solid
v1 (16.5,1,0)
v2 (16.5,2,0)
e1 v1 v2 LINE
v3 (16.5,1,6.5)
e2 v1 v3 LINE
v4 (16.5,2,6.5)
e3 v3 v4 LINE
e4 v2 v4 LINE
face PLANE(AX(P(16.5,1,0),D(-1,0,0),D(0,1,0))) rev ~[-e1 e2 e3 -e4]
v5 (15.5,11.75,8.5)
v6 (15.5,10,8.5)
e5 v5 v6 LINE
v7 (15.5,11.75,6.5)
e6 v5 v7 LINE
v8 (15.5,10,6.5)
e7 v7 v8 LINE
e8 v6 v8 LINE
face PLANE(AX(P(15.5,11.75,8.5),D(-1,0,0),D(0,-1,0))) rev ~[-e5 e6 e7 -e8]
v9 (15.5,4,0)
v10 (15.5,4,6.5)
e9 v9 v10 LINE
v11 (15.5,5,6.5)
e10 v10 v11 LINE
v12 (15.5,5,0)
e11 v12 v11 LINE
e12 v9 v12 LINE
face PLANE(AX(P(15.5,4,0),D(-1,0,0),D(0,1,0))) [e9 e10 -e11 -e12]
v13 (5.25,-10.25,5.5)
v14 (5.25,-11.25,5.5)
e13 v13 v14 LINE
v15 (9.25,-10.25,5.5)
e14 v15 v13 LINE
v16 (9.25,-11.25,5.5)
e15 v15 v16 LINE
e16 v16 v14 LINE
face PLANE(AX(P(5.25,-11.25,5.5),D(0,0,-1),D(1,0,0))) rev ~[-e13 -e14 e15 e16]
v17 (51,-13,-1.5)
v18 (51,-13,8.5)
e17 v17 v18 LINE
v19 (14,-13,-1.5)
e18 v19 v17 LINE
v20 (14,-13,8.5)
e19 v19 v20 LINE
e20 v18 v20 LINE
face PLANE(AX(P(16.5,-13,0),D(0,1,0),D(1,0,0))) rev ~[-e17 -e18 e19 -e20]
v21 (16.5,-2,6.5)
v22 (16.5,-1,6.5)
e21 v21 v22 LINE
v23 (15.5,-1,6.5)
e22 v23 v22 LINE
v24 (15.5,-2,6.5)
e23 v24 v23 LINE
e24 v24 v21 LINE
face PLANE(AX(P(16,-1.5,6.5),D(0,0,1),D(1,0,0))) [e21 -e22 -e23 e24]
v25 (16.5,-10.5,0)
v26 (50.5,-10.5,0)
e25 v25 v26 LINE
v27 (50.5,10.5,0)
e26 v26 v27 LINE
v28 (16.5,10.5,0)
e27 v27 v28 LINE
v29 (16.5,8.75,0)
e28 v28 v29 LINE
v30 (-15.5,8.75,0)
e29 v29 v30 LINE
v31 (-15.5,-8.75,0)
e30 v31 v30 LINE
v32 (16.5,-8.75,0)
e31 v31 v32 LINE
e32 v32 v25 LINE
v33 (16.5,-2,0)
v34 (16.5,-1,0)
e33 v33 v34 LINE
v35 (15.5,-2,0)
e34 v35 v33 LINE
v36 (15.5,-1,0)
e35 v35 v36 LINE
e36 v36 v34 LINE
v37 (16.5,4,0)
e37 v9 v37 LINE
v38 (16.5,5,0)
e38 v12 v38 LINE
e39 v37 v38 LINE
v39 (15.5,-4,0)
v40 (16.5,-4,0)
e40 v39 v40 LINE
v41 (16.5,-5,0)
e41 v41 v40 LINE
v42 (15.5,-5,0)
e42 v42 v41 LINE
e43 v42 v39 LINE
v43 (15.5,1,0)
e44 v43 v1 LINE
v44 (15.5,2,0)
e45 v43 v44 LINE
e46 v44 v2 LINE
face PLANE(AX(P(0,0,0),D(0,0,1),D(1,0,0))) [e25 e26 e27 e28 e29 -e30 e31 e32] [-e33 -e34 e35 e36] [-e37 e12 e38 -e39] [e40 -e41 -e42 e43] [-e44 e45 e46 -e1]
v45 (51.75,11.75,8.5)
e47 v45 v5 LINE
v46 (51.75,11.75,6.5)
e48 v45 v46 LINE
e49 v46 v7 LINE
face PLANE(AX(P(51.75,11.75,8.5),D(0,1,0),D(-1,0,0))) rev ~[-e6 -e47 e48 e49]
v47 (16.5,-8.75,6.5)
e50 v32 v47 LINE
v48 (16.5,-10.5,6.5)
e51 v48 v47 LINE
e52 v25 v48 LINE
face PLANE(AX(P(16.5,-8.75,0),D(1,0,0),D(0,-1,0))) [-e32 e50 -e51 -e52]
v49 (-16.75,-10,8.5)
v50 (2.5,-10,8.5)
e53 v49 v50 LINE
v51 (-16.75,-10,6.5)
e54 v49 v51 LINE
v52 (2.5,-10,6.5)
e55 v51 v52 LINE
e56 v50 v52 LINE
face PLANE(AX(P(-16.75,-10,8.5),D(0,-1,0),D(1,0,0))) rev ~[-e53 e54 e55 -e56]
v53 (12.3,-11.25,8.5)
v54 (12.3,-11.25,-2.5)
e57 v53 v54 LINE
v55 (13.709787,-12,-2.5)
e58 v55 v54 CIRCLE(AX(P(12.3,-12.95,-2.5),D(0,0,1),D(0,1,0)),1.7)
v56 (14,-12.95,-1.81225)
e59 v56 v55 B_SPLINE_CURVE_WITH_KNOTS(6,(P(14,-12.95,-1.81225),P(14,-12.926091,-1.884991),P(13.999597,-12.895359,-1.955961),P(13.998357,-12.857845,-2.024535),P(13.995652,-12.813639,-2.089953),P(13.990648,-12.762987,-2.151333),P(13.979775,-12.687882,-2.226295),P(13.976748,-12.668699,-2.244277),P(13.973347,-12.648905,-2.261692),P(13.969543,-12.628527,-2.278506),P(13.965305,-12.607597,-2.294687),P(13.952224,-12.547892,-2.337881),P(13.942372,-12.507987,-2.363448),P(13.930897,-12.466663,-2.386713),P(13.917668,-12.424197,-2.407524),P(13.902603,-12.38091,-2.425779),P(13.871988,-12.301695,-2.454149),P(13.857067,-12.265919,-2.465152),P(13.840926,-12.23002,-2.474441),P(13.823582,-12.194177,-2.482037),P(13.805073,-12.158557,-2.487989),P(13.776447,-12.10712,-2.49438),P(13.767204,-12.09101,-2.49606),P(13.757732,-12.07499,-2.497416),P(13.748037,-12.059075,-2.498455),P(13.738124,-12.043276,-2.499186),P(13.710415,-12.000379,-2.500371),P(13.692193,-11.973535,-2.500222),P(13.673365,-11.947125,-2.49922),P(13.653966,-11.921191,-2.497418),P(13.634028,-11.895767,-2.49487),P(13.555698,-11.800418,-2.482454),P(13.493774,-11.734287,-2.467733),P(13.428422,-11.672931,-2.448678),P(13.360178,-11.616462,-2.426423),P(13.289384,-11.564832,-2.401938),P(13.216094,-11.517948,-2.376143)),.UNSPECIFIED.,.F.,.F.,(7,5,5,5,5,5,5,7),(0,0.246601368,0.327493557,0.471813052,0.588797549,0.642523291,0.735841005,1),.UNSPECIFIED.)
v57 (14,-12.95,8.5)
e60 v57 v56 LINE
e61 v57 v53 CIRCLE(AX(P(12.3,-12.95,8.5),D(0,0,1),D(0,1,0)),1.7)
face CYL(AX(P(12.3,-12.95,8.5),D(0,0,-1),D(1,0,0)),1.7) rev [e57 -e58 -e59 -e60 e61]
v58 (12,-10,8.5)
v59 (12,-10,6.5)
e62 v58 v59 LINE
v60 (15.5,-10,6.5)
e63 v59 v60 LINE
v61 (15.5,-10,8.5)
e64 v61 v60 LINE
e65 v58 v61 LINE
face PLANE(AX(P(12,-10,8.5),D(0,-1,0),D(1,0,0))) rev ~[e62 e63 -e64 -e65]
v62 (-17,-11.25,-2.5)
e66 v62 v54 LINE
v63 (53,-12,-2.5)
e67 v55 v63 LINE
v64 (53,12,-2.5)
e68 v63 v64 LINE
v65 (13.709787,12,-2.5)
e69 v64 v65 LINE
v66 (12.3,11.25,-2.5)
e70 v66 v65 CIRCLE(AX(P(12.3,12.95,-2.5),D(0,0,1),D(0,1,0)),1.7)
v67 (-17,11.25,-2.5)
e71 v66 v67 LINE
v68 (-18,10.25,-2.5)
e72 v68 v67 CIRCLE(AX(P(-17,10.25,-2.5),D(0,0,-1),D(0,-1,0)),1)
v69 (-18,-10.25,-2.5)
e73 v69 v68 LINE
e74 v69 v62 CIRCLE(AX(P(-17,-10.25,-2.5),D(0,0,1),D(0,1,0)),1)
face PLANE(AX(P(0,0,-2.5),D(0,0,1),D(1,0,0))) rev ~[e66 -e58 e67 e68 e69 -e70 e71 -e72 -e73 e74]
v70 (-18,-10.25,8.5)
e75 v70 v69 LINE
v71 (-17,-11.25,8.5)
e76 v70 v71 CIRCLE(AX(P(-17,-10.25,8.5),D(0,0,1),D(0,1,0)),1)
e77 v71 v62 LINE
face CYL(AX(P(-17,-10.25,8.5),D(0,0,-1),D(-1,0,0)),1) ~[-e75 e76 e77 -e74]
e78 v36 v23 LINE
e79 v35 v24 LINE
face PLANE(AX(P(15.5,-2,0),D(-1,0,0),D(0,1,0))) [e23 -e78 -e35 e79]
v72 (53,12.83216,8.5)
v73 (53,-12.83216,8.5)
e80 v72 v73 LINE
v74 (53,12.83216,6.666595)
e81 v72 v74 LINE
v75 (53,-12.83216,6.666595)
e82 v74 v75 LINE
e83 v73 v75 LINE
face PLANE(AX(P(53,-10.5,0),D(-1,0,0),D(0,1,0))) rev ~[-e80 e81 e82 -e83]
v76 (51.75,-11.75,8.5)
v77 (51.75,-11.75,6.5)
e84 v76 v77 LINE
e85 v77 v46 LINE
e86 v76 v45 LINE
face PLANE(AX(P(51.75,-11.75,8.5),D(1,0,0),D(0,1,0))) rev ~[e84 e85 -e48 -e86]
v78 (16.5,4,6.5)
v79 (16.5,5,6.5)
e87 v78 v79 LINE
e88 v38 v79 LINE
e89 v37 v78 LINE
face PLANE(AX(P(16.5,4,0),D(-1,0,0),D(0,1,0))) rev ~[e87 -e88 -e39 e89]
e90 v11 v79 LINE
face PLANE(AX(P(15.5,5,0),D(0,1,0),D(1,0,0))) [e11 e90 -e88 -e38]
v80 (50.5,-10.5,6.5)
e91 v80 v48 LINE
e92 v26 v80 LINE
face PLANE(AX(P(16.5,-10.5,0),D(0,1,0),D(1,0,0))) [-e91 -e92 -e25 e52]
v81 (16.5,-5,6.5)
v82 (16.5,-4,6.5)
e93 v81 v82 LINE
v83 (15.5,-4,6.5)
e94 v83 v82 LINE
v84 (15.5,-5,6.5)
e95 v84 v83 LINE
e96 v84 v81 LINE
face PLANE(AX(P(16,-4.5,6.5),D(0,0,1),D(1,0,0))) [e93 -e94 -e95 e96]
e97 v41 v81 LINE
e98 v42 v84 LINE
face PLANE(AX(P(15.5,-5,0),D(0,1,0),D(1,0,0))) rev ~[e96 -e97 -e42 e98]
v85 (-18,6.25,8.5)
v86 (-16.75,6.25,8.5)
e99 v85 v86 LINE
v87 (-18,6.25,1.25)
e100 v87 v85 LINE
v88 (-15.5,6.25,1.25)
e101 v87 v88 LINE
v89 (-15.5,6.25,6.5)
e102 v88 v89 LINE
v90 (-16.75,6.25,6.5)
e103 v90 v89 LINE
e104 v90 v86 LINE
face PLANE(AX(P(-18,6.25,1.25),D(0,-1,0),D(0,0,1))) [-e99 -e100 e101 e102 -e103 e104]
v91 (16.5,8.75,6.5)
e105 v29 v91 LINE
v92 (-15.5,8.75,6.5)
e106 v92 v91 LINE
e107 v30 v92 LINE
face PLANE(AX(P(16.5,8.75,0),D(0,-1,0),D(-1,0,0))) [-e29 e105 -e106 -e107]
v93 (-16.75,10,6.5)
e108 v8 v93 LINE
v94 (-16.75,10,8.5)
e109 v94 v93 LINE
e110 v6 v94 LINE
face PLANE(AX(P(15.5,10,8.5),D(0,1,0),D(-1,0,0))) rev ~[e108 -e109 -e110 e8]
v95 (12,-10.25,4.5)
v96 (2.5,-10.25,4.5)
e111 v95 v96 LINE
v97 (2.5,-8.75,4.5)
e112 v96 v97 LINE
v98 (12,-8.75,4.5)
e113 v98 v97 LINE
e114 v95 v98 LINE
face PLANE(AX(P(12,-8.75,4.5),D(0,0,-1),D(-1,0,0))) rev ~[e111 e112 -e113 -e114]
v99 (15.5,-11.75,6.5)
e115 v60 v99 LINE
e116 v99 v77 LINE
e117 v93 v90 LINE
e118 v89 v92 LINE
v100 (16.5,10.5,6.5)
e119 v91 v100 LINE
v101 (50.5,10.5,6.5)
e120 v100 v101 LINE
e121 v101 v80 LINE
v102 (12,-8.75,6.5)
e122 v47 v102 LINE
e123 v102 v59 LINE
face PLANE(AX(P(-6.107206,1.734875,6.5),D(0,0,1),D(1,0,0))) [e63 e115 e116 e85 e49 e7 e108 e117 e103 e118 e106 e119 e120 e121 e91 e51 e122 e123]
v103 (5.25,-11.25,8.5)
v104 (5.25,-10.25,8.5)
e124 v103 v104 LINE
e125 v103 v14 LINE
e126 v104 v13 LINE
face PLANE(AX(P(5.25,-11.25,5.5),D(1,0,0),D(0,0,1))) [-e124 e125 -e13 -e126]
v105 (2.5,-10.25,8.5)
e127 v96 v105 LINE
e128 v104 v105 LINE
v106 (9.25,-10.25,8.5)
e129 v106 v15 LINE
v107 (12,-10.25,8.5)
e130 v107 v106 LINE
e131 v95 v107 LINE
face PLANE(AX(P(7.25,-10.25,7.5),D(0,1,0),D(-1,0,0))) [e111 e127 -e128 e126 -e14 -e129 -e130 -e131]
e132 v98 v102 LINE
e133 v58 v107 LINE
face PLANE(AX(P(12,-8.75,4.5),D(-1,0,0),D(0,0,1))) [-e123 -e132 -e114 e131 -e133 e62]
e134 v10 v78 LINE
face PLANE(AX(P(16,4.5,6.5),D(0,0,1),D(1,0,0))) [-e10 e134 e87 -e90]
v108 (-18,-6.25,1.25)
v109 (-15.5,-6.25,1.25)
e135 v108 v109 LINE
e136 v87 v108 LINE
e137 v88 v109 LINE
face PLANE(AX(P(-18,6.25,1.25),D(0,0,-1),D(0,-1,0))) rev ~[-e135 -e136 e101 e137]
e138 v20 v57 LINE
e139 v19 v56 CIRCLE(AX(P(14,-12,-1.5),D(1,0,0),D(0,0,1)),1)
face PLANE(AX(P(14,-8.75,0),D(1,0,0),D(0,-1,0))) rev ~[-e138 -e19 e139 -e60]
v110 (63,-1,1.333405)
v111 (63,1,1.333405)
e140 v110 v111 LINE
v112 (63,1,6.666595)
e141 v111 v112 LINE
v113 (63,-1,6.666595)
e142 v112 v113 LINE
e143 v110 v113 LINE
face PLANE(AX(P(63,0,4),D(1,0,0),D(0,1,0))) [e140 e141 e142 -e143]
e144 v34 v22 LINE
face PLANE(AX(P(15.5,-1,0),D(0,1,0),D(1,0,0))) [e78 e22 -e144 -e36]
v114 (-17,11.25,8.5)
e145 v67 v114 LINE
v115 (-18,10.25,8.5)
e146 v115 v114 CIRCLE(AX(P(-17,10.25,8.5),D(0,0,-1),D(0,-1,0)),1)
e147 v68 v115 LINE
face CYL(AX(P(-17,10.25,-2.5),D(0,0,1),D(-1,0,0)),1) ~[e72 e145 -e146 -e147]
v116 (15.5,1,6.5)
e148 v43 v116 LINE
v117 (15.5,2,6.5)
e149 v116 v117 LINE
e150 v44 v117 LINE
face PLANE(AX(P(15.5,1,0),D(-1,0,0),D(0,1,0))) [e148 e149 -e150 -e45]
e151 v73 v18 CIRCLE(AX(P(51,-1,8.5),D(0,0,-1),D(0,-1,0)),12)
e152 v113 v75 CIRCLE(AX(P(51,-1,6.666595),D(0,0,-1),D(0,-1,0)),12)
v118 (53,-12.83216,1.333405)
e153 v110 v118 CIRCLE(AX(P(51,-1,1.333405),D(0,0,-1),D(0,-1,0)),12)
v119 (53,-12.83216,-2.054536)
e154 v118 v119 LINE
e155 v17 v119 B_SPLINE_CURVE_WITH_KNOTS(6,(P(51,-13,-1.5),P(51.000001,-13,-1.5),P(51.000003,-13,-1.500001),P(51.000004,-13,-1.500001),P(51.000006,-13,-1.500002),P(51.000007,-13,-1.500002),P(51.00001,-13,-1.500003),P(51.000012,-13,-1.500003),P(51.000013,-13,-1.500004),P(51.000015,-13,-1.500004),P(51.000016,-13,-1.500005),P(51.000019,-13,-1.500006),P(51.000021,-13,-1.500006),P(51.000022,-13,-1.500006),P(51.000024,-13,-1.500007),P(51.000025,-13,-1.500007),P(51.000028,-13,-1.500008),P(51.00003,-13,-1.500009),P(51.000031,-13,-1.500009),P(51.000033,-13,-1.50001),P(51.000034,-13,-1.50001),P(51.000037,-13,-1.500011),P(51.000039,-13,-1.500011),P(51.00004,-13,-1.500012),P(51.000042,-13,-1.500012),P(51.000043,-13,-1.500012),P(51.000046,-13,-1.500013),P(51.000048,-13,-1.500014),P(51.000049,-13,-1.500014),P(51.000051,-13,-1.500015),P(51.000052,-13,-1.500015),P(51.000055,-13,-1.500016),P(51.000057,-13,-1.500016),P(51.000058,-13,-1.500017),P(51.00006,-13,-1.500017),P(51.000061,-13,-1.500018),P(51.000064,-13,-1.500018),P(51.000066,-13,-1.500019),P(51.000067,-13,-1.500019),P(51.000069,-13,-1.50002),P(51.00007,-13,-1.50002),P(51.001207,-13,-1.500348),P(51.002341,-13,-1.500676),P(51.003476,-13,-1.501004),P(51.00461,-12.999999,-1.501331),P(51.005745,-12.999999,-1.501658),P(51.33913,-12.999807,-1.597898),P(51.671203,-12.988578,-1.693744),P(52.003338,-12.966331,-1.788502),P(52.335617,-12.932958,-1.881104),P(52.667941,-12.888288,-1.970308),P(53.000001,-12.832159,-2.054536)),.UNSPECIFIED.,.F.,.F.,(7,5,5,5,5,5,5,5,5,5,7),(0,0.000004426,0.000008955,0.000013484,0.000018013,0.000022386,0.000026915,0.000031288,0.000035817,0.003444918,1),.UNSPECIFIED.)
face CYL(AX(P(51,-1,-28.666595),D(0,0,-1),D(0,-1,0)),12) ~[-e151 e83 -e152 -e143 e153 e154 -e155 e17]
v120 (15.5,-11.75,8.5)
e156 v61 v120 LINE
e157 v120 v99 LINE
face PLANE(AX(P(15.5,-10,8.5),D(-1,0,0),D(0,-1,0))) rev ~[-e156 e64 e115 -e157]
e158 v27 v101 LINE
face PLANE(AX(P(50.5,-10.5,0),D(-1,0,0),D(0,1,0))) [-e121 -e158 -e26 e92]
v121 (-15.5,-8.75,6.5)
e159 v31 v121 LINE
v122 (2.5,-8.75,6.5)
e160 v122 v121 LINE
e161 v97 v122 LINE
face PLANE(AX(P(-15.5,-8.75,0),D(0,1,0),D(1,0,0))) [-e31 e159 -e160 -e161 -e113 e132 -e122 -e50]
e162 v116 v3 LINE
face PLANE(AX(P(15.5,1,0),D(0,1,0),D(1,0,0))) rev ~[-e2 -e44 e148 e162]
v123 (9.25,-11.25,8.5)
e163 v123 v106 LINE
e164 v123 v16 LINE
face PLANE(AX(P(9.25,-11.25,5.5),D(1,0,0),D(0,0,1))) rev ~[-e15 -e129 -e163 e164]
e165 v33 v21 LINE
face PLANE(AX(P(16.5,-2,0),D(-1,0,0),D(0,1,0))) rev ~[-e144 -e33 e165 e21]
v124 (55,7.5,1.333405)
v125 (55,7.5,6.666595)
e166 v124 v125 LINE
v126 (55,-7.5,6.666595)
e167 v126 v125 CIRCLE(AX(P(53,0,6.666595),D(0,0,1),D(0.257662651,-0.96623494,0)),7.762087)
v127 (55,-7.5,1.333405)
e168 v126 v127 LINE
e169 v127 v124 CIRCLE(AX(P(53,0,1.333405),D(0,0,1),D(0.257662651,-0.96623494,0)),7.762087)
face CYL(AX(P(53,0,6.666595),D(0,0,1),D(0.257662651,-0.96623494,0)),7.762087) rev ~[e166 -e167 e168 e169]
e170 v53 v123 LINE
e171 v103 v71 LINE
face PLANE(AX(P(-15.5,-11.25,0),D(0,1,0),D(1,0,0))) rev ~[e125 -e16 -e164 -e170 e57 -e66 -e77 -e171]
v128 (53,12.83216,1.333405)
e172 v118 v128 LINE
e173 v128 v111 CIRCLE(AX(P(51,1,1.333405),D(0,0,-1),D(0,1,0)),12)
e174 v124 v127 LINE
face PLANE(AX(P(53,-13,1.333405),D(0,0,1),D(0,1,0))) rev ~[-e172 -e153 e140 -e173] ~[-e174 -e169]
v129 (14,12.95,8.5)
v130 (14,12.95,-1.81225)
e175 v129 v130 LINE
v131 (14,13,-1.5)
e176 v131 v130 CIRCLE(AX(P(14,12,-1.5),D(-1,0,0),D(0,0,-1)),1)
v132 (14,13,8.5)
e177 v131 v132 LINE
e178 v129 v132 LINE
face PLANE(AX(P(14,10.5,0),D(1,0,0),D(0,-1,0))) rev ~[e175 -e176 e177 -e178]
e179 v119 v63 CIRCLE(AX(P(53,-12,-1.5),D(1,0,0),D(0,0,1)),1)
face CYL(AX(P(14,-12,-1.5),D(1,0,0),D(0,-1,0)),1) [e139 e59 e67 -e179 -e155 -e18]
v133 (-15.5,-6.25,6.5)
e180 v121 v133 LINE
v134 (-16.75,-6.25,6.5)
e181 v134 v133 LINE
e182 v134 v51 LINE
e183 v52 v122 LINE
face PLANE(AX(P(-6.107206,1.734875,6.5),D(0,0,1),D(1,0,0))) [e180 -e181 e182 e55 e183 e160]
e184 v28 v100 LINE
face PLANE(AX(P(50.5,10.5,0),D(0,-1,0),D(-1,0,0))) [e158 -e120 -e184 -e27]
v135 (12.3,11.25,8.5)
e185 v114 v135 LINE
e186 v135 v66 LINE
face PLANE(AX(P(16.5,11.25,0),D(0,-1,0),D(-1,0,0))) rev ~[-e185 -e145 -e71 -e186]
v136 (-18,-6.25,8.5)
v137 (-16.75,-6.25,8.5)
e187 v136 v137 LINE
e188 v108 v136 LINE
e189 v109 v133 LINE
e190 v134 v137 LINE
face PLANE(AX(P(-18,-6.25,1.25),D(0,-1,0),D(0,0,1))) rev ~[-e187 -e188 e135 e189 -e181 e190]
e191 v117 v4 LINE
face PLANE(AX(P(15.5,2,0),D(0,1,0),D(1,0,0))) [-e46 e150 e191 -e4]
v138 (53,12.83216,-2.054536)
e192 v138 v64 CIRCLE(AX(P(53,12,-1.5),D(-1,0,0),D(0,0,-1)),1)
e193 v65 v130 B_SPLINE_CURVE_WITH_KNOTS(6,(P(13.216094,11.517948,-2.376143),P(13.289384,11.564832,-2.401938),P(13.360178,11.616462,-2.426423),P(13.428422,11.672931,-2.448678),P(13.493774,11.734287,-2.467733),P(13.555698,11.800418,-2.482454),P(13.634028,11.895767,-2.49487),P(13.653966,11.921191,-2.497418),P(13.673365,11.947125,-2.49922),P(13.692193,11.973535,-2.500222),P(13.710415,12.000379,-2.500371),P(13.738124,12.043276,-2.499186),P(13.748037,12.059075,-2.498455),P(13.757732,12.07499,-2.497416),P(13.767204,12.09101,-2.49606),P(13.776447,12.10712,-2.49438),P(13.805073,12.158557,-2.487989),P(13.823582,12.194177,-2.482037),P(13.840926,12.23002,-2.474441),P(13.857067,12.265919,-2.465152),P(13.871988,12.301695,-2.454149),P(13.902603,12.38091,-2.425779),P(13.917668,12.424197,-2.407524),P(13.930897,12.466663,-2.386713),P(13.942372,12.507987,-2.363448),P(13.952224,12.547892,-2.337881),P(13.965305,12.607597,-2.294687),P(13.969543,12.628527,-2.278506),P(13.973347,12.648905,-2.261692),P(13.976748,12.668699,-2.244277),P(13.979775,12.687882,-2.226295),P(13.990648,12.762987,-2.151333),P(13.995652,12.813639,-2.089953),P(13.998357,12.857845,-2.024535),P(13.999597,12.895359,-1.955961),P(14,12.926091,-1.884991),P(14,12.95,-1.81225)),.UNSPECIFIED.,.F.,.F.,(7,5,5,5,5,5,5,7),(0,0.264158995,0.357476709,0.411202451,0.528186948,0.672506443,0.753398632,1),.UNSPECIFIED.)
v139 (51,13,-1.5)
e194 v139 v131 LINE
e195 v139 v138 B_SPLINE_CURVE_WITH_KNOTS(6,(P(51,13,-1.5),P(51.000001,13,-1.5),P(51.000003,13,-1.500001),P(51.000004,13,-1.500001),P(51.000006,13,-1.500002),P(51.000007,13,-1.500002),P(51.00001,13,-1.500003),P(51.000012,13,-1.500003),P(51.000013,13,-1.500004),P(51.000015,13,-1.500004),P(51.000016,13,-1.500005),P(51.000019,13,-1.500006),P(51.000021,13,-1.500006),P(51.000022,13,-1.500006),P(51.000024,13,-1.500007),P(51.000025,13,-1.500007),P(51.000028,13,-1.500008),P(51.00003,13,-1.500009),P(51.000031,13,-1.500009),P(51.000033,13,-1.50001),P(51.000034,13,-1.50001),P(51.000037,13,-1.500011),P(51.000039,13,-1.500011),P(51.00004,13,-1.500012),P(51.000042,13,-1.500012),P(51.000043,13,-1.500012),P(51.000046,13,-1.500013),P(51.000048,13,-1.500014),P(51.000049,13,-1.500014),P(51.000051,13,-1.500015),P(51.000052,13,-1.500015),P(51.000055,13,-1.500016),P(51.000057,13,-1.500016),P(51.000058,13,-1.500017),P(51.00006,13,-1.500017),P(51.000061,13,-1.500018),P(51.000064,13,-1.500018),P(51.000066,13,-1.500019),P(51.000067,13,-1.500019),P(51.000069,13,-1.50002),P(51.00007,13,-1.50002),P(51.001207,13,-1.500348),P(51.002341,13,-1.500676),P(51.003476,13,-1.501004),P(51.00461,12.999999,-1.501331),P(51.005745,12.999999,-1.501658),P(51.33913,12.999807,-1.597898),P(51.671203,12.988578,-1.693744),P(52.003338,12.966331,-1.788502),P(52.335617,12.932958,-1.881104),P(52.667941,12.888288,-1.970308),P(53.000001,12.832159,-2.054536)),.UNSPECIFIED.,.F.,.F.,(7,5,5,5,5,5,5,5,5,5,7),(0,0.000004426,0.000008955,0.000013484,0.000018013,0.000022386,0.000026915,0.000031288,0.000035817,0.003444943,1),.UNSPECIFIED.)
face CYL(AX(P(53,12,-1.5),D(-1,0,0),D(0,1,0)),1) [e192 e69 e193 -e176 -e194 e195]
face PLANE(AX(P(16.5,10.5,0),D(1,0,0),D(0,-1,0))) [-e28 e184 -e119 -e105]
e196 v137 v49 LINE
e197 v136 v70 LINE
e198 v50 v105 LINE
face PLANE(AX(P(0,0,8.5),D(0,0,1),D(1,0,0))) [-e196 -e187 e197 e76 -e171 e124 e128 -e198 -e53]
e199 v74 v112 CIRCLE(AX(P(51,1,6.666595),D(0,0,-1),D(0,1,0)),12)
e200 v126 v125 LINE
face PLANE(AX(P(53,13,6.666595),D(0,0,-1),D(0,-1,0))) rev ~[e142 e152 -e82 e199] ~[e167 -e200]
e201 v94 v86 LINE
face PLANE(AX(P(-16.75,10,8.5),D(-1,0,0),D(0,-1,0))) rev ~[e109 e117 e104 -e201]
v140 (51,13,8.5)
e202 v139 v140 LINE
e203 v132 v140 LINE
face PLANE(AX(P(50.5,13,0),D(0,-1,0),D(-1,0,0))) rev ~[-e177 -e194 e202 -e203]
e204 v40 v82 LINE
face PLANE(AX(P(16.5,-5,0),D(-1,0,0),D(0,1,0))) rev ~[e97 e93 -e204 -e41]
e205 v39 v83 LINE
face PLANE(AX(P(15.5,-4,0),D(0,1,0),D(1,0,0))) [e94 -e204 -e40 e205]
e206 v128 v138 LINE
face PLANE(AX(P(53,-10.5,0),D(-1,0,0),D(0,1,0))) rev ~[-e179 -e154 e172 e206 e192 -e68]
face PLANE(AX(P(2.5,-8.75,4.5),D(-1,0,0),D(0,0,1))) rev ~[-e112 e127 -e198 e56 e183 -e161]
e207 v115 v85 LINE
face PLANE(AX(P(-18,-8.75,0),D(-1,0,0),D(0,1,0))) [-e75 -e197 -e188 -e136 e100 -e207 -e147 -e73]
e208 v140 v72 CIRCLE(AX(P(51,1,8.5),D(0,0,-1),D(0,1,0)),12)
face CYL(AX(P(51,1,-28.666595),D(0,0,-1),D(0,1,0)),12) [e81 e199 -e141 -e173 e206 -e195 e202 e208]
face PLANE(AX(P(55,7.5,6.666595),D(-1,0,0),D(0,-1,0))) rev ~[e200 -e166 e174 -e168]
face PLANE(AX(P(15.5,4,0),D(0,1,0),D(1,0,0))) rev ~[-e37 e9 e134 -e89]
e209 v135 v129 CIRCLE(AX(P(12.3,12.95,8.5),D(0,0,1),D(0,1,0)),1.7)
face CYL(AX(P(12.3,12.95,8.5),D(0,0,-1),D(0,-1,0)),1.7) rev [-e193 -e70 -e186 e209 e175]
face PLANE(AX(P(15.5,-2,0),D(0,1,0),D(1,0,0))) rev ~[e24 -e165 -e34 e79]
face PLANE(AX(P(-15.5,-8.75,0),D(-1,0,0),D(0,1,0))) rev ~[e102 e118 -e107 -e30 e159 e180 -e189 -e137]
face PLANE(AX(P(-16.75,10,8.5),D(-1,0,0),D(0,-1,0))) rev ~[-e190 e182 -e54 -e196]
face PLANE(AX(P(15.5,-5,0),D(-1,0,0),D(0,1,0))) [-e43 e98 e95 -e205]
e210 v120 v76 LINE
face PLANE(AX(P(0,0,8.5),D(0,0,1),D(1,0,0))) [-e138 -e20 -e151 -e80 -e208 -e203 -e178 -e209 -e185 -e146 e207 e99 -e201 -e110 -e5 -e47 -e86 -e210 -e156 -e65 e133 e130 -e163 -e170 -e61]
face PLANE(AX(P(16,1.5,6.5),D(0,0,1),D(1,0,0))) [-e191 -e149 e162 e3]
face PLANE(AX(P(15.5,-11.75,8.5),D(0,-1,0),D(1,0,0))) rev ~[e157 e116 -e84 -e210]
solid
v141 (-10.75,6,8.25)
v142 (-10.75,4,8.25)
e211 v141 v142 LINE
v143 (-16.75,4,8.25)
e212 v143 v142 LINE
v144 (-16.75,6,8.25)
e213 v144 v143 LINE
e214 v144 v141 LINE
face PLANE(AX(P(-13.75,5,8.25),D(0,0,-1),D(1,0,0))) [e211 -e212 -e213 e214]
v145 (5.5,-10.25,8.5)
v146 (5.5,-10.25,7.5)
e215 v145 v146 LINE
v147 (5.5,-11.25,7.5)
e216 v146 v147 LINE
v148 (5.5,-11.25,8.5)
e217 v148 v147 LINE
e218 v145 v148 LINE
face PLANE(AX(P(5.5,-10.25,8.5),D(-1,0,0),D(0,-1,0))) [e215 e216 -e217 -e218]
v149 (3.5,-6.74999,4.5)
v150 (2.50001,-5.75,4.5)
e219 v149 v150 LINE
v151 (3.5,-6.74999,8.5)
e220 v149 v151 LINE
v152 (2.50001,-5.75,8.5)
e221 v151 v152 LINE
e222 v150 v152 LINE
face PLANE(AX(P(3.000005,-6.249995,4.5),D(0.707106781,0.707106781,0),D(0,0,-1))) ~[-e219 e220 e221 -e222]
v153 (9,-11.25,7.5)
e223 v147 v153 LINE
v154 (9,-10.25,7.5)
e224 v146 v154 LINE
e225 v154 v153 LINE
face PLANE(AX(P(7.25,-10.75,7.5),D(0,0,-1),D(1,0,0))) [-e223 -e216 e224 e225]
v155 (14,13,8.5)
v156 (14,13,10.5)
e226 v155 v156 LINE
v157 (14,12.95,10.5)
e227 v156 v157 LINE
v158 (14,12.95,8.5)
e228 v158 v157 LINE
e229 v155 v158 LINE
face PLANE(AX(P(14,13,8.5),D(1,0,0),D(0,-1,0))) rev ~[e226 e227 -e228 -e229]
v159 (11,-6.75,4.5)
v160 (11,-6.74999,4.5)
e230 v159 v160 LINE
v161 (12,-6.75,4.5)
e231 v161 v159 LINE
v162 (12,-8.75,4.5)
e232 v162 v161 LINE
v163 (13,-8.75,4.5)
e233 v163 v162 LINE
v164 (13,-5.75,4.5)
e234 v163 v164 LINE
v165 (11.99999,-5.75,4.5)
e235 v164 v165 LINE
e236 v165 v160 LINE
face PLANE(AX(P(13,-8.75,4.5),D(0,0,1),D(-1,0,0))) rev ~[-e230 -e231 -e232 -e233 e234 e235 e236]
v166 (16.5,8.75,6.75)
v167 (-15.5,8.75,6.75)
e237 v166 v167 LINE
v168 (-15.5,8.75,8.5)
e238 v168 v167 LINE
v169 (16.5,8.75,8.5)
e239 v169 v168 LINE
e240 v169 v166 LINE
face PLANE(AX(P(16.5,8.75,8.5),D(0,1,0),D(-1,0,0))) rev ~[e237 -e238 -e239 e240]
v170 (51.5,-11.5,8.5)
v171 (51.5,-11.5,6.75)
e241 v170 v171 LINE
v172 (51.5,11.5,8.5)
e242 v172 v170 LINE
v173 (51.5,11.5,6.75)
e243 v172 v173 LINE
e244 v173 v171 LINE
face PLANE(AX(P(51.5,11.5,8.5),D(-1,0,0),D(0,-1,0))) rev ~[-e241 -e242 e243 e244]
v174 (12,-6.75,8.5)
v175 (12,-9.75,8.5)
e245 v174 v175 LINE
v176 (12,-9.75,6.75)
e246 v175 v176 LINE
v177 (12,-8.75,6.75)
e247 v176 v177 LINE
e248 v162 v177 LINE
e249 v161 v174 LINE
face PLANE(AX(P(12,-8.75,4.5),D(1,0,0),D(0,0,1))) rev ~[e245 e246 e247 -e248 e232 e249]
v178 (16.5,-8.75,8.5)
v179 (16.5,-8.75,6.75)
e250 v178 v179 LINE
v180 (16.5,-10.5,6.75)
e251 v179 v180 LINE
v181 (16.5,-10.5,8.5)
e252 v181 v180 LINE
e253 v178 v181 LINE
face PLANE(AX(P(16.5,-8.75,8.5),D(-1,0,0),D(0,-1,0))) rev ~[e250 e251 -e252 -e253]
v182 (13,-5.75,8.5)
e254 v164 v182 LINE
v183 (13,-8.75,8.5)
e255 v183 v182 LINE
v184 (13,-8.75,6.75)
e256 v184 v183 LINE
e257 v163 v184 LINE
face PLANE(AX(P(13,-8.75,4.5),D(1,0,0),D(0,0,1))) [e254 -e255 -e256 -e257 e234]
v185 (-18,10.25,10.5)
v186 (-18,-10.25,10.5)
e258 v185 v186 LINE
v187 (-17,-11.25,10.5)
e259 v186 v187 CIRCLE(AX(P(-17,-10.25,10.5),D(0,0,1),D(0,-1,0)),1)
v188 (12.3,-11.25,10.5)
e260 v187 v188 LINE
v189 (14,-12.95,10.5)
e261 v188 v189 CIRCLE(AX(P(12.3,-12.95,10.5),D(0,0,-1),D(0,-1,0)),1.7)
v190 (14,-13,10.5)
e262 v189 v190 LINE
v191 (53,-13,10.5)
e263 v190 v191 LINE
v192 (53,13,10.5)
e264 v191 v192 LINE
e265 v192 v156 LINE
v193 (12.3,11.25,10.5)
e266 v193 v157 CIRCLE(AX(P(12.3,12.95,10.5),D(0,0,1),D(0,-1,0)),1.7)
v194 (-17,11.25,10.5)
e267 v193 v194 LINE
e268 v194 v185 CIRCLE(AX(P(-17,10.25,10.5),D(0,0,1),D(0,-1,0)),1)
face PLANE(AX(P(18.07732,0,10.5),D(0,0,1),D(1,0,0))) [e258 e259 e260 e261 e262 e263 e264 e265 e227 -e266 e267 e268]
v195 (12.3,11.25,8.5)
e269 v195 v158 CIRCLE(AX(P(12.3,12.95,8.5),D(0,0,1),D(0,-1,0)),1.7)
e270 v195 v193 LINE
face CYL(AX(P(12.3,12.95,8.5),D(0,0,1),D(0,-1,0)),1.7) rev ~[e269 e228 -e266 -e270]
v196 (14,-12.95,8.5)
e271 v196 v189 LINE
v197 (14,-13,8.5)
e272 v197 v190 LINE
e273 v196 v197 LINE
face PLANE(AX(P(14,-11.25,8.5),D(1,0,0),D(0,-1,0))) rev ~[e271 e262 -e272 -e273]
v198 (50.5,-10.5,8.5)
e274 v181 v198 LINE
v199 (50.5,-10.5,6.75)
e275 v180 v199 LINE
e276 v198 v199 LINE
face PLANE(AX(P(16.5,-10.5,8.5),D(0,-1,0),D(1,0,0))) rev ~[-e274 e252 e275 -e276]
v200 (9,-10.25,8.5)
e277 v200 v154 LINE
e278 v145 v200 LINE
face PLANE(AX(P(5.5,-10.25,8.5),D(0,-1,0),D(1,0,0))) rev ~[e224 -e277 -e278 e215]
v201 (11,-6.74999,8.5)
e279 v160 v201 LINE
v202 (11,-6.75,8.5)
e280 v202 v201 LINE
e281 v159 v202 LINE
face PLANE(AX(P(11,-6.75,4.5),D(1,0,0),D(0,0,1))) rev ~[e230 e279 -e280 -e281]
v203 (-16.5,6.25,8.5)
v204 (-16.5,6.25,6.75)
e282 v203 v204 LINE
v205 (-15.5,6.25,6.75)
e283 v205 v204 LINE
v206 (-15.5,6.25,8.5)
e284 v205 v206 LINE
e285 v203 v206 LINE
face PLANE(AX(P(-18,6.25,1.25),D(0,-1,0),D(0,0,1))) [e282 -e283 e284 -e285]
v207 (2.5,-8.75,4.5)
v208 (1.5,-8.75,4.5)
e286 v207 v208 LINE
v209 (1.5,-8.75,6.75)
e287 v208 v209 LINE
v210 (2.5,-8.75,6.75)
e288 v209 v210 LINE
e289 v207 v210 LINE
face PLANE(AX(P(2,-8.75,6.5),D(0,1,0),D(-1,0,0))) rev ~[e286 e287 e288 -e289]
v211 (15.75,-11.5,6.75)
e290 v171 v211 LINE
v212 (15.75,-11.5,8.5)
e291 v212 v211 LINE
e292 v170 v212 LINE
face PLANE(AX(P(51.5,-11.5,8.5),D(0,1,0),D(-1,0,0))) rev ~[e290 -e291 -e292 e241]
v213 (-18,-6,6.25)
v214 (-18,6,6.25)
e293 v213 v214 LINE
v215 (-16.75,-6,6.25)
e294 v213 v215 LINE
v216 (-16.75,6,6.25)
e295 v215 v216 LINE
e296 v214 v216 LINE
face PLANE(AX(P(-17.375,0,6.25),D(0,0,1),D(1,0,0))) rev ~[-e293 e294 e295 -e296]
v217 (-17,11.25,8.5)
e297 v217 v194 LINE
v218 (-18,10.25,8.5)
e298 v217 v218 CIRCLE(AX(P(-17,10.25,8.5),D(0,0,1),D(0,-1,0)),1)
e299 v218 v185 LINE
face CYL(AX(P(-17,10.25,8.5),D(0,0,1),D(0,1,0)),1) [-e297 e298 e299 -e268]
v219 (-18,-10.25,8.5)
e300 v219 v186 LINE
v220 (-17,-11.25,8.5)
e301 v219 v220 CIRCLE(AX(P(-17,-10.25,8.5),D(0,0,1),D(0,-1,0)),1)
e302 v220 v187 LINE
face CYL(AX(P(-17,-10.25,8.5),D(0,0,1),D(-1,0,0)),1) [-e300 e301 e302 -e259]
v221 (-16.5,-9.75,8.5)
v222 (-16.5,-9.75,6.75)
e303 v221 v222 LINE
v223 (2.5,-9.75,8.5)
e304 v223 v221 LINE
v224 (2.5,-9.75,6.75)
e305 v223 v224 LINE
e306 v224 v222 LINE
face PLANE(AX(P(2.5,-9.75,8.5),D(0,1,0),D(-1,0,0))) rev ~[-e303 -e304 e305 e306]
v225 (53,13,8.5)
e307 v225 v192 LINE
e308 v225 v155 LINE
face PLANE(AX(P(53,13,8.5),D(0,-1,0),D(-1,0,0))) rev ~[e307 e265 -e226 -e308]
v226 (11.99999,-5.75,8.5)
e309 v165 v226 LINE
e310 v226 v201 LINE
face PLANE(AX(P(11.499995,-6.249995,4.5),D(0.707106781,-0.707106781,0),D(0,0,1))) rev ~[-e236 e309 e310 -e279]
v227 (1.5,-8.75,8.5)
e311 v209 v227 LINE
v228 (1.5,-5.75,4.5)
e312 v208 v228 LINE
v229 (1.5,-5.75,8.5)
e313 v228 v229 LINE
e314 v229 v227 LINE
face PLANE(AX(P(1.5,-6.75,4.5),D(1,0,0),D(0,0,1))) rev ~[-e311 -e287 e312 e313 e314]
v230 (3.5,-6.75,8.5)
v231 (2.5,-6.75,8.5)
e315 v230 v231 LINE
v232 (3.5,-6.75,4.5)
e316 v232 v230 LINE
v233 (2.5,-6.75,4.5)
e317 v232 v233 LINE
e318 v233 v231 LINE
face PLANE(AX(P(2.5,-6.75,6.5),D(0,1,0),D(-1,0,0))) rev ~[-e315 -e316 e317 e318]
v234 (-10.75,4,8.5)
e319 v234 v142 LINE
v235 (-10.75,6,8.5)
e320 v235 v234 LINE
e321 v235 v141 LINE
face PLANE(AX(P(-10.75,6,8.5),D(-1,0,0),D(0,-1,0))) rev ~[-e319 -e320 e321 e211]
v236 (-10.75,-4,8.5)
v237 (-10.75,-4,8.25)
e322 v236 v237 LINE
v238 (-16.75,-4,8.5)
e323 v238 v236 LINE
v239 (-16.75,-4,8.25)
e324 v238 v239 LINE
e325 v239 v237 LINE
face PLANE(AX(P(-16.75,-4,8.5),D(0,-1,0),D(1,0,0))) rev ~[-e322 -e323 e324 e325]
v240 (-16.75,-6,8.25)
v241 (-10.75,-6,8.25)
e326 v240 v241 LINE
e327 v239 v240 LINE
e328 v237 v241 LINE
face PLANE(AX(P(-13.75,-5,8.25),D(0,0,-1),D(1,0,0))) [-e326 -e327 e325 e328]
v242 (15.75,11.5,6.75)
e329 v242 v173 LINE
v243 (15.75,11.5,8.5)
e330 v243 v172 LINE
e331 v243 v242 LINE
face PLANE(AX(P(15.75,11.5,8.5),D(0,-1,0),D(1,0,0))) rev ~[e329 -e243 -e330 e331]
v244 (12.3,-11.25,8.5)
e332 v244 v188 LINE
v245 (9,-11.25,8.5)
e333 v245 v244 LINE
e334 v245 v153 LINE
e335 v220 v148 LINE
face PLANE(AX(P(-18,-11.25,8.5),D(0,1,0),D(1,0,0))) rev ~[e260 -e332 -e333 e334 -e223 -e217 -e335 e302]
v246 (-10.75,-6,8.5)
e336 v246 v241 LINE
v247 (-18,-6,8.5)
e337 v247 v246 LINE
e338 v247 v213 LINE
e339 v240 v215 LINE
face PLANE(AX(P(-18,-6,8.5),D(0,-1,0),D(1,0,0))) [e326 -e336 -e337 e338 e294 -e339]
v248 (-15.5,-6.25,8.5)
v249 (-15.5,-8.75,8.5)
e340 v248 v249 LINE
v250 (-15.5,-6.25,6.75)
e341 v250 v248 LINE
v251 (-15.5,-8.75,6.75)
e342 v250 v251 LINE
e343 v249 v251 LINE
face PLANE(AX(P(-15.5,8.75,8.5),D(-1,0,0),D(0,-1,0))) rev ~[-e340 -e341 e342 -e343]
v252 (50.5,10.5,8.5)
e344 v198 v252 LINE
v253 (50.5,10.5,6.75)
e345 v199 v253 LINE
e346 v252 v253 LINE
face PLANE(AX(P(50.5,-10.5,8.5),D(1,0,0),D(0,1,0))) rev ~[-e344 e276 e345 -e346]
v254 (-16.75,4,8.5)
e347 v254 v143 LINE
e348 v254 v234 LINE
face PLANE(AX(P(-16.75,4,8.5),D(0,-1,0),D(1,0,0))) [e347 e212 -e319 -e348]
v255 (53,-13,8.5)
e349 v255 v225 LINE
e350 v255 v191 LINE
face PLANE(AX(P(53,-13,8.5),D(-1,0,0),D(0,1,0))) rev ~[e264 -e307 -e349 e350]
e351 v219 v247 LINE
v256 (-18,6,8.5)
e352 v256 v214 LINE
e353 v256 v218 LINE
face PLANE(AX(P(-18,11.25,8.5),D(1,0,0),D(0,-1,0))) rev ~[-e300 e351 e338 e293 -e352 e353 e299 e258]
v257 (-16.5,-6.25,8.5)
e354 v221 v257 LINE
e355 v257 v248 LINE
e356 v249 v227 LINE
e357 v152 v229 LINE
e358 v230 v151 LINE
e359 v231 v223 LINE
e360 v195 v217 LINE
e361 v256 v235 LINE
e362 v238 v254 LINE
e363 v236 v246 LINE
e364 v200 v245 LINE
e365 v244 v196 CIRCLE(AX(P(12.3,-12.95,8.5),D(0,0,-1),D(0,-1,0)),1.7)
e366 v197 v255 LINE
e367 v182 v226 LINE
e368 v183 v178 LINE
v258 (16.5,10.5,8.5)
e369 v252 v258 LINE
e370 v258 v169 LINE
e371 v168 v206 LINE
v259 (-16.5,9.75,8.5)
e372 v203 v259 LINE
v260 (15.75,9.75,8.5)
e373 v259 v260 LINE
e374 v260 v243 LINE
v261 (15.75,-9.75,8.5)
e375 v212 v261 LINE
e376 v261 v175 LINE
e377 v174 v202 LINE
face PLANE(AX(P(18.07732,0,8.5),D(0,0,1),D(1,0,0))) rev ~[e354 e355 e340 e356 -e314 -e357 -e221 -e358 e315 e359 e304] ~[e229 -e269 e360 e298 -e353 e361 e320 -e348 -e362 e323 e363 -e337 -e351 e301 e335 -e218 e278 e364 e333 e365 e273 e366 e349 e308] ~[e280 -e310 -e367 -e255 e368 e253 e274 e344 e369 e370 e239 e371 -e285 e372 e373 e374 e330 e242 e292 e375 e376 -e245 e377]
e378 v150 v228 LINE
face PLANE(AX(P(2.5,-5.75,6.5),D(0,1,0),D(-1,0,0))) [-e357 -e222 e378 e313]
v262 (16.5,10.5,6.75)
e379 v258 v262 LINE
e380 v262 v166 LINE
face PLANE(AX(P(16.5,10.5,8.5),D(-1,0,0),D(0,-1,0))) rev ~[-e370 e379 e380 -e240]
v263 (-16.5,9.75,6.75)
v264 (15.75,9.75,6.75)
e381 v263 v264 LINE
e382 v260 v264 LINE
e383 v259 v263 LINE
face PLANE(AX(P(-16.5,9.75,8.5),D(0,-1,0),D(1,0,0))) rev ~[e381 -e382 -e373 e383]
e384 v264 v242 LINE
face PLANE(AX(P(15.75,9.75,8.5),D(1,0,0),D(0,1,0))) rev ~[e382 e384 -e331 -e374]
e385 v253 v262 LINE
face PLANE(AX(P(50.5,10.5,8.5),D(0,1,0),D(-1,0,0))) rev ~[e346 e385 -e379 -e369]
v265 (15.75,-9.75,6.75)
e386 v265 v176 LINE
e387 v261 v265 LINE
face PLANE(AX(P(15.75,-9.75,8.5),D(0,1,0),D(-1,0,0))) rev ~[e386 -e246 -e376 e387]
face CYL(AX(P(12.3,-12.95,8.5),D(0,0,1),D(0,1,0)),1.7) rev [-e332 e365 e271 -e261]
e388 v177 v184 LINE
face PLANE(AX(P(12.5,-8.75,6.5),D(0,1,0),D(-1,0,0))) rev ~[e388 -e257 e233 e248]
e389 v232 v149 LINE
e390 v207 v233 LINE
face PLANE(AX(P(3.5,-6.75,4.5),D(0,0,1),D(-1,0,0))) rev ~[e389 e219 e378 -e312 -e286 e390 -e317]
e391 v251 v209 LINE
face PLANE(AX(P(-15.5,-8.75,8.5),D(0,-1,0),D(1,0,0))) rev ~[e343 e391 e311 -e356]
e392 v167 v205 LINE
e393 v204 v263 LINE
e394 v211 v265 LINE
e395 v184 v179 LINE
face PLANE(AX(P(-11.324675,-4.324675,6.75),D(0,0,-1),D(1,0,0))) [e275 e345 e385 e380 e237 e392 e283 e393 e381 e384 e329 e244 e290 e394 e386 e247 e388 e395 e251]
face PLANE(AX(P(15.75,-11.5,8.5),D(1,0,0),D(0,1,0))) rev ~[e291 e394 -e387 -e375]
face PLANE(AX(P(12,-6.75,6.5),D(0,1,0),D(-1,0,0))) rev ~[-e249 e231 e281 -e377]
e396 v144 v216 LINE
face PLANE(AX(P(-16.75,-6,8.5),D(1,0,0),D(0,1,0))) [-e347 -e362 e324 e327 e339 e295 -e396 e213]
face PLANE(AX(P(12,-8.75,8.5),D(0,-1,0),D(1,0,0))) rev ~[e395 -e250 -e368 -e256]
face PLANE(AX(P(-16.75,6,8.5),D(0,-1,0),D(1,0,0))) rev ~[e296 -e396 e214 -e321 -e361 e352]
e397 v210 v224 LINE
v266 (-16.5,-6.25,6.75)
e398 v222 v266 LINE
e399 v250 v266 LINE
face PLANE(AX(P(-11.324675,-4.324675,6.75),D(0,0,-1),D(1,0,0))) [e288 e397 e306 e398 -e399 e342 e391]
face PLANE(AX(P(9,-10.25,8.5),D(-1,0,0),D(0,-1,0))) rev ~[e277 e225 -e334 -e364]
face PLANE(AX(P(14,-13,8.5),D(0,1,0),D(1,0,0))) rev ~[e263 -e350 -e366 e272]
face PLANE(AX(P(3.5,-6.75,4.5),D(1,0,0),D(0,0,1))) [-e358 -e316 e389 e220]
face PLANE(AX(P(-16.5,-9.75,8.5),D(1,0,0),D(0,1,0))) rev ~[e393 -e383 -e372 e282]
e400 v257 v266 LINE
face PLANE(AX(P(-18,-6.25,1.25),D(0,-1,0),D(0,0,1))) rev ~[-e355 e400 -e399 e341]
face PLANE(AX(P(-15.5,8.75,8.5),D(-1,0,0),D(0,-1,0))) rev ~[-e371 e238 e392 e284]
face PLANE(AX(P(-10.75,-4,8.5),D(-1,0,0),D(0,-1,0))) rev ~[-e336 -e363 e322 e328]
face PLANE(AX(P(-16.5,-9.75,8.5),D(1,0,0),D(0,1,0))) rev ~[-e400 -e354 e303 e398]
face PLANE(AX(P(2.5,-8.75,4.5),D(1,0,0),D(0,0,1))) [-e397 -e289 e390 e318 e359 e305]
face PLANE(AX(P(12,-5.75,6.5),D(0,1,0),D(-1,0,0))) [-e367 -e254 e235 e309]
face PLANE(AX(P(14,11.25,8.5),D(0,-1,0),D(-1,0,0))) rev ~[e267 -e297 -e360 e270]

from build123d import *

# Parameters (mm, degrees)
F0_W         = 31
F0_H         = 17.5
F0_W_2       = 1
F1_DEPTH     = 8.5
F2_T         = 2.5
F3_W         = 1
F3_H         = 1
F4_DEPTH     = 6.5
F5_R         = 1
F6_W         = 9.5
F6_H         = 6
F8_DEPTH     = 1.5
F7_W         = 4
F7_H         = 4
F9_DEPTH     = 2
F11_DEPTH    = 2
F13_DEPTH    = 2
F14_R        = 1
F15_R        = 1.7
F15_2_R      = 1.7
F17_DEPTH    = 1.75
F18_W        = 12.5
F18_H        = 7.25
F19_DEPTH    = 3
F20_W        = 1.25
F20_H        = 12
F21_DEPTH    = 2.25
F22_W        = 3.5
F22_H        = 1
F23_DEPTH    = 1
F24_W        = 1
F24_H        = 4
F25_DEPTH    = 2
F26_W        = 2
F26_H        = 4
F27_DEPTH    = 1
F28_SIZE     = 0.99999
F29_W        = 6
F29_H        = 2
F30_DEPTH    = 0.25
F32_DEPTH    = 10
F33_T1_DEPTH = 65.3331902927
F35_DEPTH    = 10


# Not quite as in the source:
# - a fillet or chamfer that OpenCascade refuses, or shapes differently, is made with other operations: its cross-section is extruded or revolved along the edge and cut away or added
# - a fillet or chamfer is up to 0.001 mm smaller than in the source, because OpenCascade refuses the exact size


with BuildPart() as f1:
    # F0 (on Top) → F1 (new body)
    with BuildSketch(Plane.XY):
        Rectangle(F0_W, F0_H)
        with Locations((16, 0)):
            Rectangle(F0_W_2, F0_H)
        Polygon((16.5, 10.5), (16.5, 8.75), (16.5, -8.75), (16.5, -10.5), (50.5, -10.5), (50.5, 10.5), align=None)
    extrude(amount=F1_DEPTH)

    # F2
    f2_openings = [f1.faces().sort_by_distance(p)[0] for p in [
        (18.994505, 0, 8.5),
    ]]
    offset(amount=F2_T, openings=f2_openings, kind=Kind.INTERSECTION)

    # F3 (on face) → F4 (join)
    with BuildSketch(Plane.XY):
        with Locations((16, 4.5)):
            Rectangle(F3_W, F3_H)
        with Locations((16, 1.5)):
            Rectangle(F3_W, F3_H)
        with Locations((16, -1.5)):
            Rectangle(F3_W, F3_H)
        with Locations((16, -4.5)):
            Rectangle(F3_W, F3_H)
    extrude(amount=F4_DEPTH)

    # F5
    f5_edges = [f1.edges().sort_by_distance(p)[0] for p in [
        (-18, 11.25, 3),
        (-18, -11.25, 3),
        (33.5, -13, -2.5),
        (33.5, 13, -2.5),
    ]]
    fillet(f5_edges, radius=F5_R)

    # F6 (on face) → F8 (cut, symmetric)
    with BuildSketch(Plane(origin=(0, -8.75, 0), x_dir=(-1, 0, 0), z_dir=(0, 1, 0))):
        with Locations((-7.25, 7.5)):
            Rectangle(F6_W, F6_H)
    extrude(amount=F8_DEPTH, both=True, mode=Mode.SUBTRACT)

    # F7 (on face) → F9 (cut, symmetric)
    with BuildSketch(Plane.XZ.offset(11.25)):
        with Locations((7.25, 7.5)):
            Rectangle(F7_W, F7_H)
    extrude(amount=F9_DEPTH, both=True, mode=Mode.SUBTRACT)

    # F10 (on face) → F11 (cut)
    with BuildSketch(Plane.XY.offset(8.5)):
        Polygon((2.5, -8.75), (-15.5, -8.75), (-15.5, 8.75), (15.5, 8.75), (15.5, 10), (-16.75, 10), (-16.75, 8.75), (-16.75, -10), (2.5, -10), align=None)
        Polygon((15.5, 10), (15.5, 8.75), (16.5, 8.75), (16.5, 10.5), (50.5, 10.5), (50.5, -10.5), (16.5, -10.5), (16.5, -8.75), (12, -8.75), (12, -10), (15.5, -10), (15.5, -11.75), (16.5, -11.75), (51.75, -11.75), (51.75, 10.5), (51.75, 11.75), (50.5, 11.75), (16.5, 11.75), (15.5, 11.75), align=None)
    extrude(amount=-F11_DEPTH, mode=Mode.SUBTRACT)

    # F15#2
    f15_2_edges = [f1.edges().sort_by_distance(p)[0] for p in [
        (14, 11.25, 3),
        (14, -11.25, 3),
    ]]
    fillet(f15_2_edges, radius=F15_2_R)


with BuildPart() as f13:
    # F12 (on face) → F13 (new body)
    with BuildSketch(Plane.XY.offset(8.5)):
        Polygon((14, 11.25), (-18, 11.25), (-18, -11.25), (14, -11.25), (14, -13), (53, -13), (53, 13), (14, 13), align=None)
    extrude(amount=F13_DEPTH)

    # F14
    f14_edges = [f13.edges().sort_by_distance(p)[0] for p in [
        (-18, 11.25, 9.5),
        (-18, -11.25, 9.5),
    ]]
    fillet(f14_edges, radius=F14_R)

    # F15
    f15_edges = [f13.edges().sort_by_distance(p)[0] for p in [
        (14, -11.25, 9.5),
        (14, 11.25, 9.5),
    ]]
    fillet(f15_edges, radius=F15_R)

    # F16 (on face) → F17 (join)
    with BuildSketch(Plane(origin=(0, 0, 8.5), x_dir=(1, 0, 0), z_dir=(0, 0, -1))):
        Polygon((-15.5, -9.75), (-15.5, -8.75), (-15.5, 8.75), (2.5, 8.75), (2.5, 9.75), (-16.5, 9.75), (-16.5, -9.75), align=None)
        Polygon((16.5, -8.75), (-15.5, -8.75), (-15.5, -9.75), (15.75, -9.75), (15.75, -11.5), (51.5, -11.5), (51.5, 11.5), (16.5, 11.5), (15.75, 11.5), (15.75, 9.75), (12, 9.75), (12, 8.75), (16.5, 8.75), (16.5, 10.5), (50.5, 10.5), (50.5, -10.5), (16.5, -10.5), align=None)
    extrude(amount=F17_DEPTH)


with BuildPart() as f19_tool:
    # F18 (on face) → F19 (new body)
    with BuildSketch(Plane(origin=(-18, 0, 0), x_dir=(0, -1, 0), z_dir=(-1, 0, 0))):
        with Locations((0, 4.875)):
            Rectangle(F18_W, F18_H)
    extrude(amount=-F19_DEPTH)


with BuildPart() as f1_1:
    add(f1.part)

    # F19: cut by f19_tool
    add(f19_tool.part, mode=Mode.SUBTRACT)

    # F31 (on face) → F32 (join)
    with BuildSketch(Plane.YZ.offset(53)):
        Polygon((-13, 1.3334048537), (13, 1.3334048537), (13, 6.6665951463), (0, 6.6665951463), (-13, 6.6665951463), align=None)
    extrude(amount=F32_DEPTH)

    # F33: fillet of radius 12 on 2 edges, made by hand

    # F33_s2 → F33_t1 (cut)
    with BuildSketch(Plane.XY.offset(-28.6665951463)):
        with BuildLine():
            ThreePointArc((51, -13), (59.4852813742, -9.4852813742), (63, -1))
            Line((63, -1), (63, -13))
            Line((63, -13), (51, -13))
        make_face()
        with BuildLine():
            ThreePointArc((51, 13), (59.4852813742, 9.4852813742), (63, 1))
            Line((63, 1), (63, 13))
            Line((63, 13), (51, 13))
        make_face()
    extrude(amount=F33_T1_DEPTH, mode=Mode.SUBTRACT)

    # F34 (on face) → F35 (cut, symmetric)
    with BuildSketch(Plane.XY.offset(6.6665951463)):
        with BuildLine():
            Line((55, 0), (55, -7.5))
            ThreePointArc((55, -7.5), (60.7620873481, 0), (55, 7.5))
            Line((55, 7.5), (55, 0))
        make_face()
    extrude(amount=F35_DEPTH, both=True, mode=Mode.SUBTRACT)


with BuildPart() as f13_1:
    add(f13.part)

    # F19: cut by f19_tool
    add(f19_tool.part, mode=Mode.SUBTRACT)

    # F20 (on face) → F21 (join)
    with BuildSketch(Plane.XY.offset(8.5)):
        with Locations((-17.375, 0)):
            Rectangle(F20_W, F20_H)
    extrude(amount=-F21_DEPTH)

    # F22 (on face) → F23 (join)
    with BuildSketch(Plane(origin=(0, 0, 8.5), x_dir=(1, 0, 0), z_dir=(0, 0, -1))):
        with Locations((7.25, 10.75)):
            Rectangle(F22_W, F22_H)
    extrude(amount=F23_DEPTH)

    # F24 (on face) → F25 (join)
    with BuildSketch(Plane(origin=(0, -8.75, 0), x_dir=(-1, 0, 0), z_dir=(0, 1, 0))):
        with Locations((-2, 6.5)):
            Rectangle(F24_W, F24_H)
        with Locations((-12.5, 6.5)):
            Rectangle(F24_W, F24_H)
    extrude(amount=F25_DEPTH)

    # F26 (on face) → F27 (join)
    with BuildSketch(Plane(origin=(0, -6.75, 0), x_dir=(-1, 0, 0), z_dir=(0, 1, 0))):
        with Locations((-2.5, 6.5)):
            Rectangle(F26_W, F26_H)
        with Locations((-12, 6.5)):
            Rectangle(F26_W, F26_H)
    extrude(amount=F27_DEPTH)

    # F28 (size 1 in the source; OpenCascade refuses exactly that, so slightly less here)
    f28_edges = [f13_1.edges().sort_by_distance(p)[0] for p in [
        (3.5, -5.75, 6.5),
        (11, -5.75, 6.5),
    ]]
    chamfer(f28_edges, length=F28_SIZE)

    # F29 (on face) → F30 (join)
    with BuildSketch(Plane(origin=(0, 0, 8.5), x_dir=(1, 0, 0), z_dir=(0, 0, -1))):
        with Locations((-13.75, -5)):
            Rectangle(F29_W, F29_H)
        with Locations((-13.75, 5)):
            Rectangle(F29_W, F29_H)
    extrude(amount=F30_DEPTH)


solid = Compound([f1_1.part, f13_1.part])
